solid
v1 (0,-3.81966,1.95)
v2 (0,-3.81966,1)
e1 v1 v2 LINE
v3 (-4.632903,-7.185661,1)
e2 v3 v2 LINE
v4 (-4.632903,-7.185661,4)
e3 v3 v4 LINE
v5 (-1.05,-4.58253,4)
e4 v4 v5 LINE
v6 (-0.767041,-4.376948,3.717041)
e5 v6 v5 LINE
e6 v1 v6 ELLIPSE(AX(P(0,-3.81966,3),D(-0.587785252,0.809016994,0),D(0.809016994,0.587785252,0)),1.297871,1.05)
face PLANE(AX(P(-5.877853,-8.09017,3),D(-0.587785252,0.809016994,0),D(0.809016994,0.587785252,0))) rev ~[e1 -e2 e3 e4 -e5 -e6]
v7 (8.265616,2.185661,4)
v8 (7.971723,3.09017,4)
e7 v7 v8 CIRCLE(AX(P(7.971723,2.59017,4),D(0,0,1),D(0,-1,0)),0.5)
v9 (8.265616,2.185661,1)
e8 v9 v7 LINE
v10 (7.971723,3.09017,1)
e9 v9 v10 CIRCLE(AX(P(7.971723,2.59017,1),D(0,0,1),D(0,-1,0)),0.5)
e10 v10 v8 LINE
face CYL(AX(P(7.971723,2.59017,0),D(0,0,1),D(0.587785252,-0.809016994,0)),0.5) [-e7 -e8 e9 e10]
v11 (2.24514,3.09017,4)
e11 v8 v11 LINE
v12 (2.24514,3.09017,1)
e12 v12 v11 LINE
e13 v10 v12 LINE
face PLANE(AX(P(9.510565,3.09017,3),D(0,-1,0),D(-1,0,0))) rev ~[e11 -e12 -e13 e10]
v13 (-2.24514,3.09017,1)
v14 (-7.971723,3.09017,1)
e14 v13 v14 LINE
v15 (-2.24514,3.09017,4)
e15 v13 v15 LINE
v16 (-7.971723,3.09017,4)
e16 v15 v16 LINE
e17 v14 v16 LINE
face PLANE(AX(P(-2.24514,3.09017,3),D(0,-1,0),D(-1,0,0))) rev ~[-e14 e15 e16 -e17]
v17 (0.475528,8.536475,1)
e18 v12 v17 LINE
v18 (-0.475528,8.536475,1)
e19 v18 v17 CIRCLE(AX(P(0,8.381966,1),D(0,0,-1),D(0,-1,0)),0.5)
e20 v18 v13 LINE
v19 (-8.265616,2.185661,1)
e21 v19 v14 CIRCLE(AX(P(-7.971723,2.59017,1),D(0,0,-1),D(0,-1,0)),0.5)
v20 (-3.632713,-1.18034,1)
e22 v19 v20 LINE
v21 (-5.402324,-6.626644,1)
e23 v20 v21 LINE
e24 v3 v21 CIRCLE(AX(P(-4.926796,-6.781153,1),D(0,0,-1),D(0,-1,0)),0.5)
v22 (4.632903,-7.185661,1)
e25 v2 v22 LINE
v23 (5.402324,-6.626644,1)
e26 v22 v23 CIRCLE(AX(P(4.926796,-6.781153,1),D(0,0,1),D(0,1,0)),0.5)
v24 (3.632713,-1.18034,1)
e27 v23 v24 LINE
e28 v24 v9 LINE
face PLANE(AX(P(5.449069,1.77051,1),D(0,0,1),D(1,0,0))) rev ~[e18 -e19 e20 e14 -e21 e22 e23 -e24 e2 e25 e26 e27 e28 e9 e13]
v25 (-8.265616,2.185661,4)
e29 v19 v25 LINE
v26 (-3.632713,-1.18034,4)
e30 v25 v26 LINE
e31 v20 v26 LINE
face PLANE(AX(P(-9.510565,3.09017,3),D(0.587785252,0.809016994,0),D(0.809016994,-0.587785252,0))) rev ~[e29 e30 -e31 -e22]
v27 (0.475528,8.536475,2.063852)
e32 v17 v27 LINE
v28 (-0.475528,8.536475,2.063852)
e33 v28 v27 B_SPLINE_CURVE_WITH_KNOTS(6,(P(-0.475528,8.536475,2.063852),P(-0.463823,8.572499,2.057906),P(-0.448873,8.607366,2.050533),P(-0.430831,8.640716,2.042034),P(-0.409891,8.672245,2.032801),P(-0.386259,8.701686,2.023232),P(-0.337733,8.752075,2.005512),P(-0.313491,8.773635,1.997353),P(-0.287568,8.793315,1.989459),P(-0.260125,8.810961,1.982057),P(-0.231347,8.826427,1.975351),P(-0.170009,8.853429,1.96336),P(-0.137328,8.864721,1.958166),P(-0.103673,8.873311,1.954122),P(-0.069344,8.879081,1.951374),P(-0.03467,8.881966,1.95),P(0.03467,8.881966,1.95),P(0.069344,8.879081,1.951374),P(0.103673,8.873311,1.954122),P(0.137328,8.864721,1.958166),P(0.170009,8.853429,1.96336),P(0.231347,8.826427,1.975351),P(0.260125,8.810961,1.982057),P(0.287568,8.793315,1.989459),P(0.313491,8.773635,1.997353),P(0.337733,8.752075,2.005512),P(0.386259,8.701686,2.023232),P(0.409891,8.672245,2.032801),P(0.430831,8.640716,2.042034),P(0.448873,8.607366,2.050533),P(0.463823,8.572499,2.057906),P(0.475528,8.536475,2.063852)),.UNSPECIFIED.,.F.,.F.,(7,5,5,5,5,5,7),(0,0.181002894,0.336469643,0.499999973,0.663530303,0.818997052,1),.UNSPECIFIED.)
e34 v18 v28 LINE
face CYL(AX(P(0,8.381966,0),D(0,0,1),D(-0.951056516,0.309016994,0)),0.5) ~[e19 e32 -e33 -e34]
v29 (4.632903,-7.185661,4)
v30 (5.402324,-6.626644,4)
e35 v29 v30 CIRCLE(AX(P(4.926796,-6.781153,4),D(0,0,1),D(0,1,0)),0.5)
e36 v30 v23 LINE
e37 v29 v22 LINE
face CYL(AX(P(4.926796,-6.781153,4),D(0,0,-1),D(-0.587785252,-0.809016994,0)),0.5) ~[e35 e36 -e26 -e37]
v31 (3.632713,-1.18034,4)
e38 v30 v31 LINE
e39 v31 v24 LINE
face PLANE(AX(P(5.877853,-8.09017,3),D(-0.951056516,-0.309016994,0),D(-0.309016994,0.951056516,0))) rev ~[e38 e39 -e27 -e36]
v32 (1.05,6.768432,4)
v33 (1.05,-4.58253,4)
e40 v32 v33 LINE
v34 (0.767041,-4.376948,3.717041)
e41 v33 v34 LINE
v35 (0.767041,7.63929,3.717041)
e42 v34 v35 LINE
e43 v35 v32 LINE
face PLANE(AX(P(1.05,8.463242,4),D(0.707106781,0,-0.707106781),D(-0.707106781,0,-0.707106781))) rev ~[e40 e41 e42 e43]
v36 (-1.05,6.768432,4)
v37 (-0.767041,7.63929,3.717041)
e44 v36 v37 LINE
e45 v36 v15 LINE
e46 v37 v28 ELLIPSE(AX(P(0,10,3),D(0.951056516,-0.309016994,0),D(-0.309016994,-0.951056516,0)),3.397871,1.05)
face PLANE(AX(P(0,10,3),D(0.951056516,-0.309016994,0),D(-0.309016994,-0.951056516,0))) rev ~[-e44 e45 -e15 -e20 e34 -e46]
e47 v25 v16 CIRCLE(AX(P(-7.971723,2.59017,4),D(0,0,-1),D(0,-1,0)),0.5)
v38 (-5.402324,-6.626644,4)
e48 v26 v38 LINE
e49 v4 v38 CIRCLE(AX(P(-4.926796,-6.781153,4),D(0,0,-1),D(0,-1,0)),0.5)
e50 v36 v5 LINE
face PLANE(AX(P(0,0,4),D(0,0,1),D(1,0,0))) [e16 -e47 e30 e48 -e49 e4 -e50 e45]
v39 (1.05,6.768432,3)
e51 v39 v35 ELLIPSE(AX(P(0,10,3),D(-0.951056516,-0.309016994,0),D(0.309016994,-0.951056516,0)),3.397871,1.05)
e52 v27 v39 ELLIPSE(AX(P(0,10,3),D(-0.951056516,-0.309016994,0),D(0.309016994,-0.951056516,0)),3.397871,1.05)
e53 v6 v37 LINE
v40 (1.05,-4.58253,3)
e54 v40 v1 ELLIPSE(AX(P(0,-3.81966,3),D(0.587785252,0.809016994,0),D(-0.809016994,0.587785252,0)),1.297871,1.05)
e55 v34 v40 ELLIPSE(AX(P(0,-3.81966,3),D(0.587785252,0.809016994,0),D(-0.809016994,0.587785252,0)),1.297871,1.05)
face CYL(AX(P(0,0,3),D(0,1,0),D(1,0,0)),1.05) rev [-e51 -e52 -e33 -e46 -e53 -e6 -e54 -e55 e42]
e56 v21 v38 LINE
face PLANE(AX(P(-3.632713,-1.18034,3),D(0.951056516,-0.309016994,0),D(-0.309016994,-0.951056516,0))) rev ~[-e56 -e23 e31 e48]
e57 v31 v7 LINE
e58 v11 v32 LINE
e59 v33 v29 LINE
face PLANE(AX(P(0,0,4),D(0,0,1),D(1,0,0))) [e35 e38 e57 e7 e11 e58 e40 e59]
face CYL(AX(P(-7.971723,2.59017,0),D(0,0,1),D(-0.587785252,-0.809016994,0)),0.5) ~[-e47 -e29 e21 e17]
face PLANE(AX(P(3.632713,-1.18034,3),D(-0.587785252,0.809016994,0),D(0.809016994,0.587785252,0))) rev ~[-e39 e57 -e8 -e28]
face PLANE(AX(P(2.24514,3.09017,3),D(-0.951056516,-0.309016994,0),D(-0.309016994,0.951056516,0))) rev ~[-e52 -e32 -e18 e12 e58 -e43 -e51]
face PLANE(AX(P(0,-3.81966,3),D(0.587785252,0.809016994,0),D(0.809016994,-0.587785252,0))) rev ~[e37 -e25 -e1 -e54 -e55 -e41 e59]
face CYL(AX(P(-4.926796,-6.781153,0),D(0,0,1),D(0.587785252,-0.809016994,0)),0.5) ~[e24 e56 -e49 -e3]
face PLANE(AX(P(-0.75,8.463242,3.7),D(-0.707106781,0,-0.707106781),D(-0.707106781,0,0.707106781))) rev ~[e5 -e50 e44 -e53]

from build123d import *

# Parameters (mm, degrees)
F1_DEPTH      = 3
F2_W          = 4
F2_H          = 6.1803398875
F3_DEPTH      = 1
F5_DEPTH      = 10.001
F5_DEPTH_BACK = 8.0911699437
F6_R          = 0.5
F7_T1_DEPTH   = 13.5993141484
F8_DEPTH      = 1


# Not quite as in the source:
# - a fillet or chamfer that OpenCascade refuses, or shapes differently, is made with other operations: its cross-section is extruded or revolved along the edge and cut away or added


with BuildPart() as f1:
    # F0 (on Top) → F1 (new body)
    with BuildSketch(Plane.XY):
        Polygon((3.63271264, -1.1803398875), (9.510565163, 3.0901699437), (2.2451398829, 3.0901699437), align=None)
        Polygon((3.63271264, -1.1803398875), (2.2451398829, 3.0901699437), (-2.2451398829, 3.0901699437), (-3.63271264, -1.1803398875), (0, -3.8196601125), align=None)
        Polygon((-2.2451398829, 3.0901699437), (2.2451398829, 3.0901699437), (0, 10), align=None)
        Polygon((5.8778525229, -8.0901699437), (3.63271264, -1.1803398875), (0, -3.8196601125), align=None)
        Polygon((-3.63271264, -1.1803398875), (-2.2451398829, 3.0901699437), (-9.510565163, 3.0901699437), align=None)
        Polygon((-5.8778525229, -8.0901699437), (0, -3.8196601125), (-3.63271264, -1.1803398875), align=None)
    extrude(amount=F1_DEPTH)

    # F2 (on face) → F3 (join)
    with BuildSketch(Plane.XY.offset(3)):
        Polygon((3.63271264, -1.1803398875), (9.510565163, 3.0901699437), (2.2451398829, 3.0901699437), (0, 10), (-2.2451398829, 3.0901699437), (-9.510565163, 3.0901699437), (-3.63271264, -1.1803398875), (-5.8778525229, -8.0901699437), (0, -3.8196601125), (5.8778525229, -8.0901699437), align=None)
        Rectangle(F2_W, F2_H, mode=Mode.SUBTRACT)
        Rectangle(F2_W, F2_H)
    extrude(amount=F3_DEPTH)

    # F4 (on Front) → F5 (cut, two sides)
    with BuildSketch(Plane.XZ) as f5_sk:
        with BuildLine():
            ThreePointArc((-0.75, 3.7348469228), (-0.3968626967, 2.0278888952), (1.05, 3))
            ThreePointArc((1.05, 3), (0.9721111048, 3.3968626967), (0.75, 3.7348469228))
            ThreePointArc((0.75, 3.7348469228), (0, 4.05), (-0.75, 3.7348469228))
        make_face()
        with BuildLine():
            ThreePointArc((-0.75, 3.7348469228), (0, 4.05), (0.75, 3.7348469228))
            Line((0.75, 3.7348469228), (0.75, 5))
            Line((0.75, 5), (-0.75, 5))
            Line((-0.75, 5), (-0.75, 3.7348469228))
        make_face()
    extrude(amount=-F5_DEPTH, mode=Mode.SUBTRACT)
    extrude(f5_sk.sketch, amount=F5_DEPTH_BACK, mode=Mode.SUBTRACT)

    # F6
    f6_edges = [f1.edges().sort_by_distance(p)[0] for p in [
        (5.877853, -8.09017, 2),
        (9.510565, 3.09017, 2),
        (0, 10, 0.975),
        (-9.510565, 3.09017, 2),
        (-5.877853, -8.09017, 2),
    ]]
    fillet(f6_edges, radius=F6_R)

    # F7: chamfer of 0.3 on 2 edges, made by hand

    # F7_s2 → F7_t1 (cut)
    with BuildSketch(Plane.XZ.offset(-8.4632422435)):
        Polygon((-0.75, 3.7), (-1.05, 4), (-0.75, 4), align=None)
        Polygon((1.05, 4), (0.75, 3.7), (0.75, 4), align=None)
    extrude(amount=F7_T1_DEPTH, mode=Mode.SUBTRACT)

    # F8 (cut): a face of the model
    f8_faces = [f1.faces().sort_by_distance(p)[0] for p in [
        (0, 0, 0),
    ]]
    extrude(f8_faces, amount=-F8_DEPTH, mode=Mode.SUBTRACT)


solid = f1.part
